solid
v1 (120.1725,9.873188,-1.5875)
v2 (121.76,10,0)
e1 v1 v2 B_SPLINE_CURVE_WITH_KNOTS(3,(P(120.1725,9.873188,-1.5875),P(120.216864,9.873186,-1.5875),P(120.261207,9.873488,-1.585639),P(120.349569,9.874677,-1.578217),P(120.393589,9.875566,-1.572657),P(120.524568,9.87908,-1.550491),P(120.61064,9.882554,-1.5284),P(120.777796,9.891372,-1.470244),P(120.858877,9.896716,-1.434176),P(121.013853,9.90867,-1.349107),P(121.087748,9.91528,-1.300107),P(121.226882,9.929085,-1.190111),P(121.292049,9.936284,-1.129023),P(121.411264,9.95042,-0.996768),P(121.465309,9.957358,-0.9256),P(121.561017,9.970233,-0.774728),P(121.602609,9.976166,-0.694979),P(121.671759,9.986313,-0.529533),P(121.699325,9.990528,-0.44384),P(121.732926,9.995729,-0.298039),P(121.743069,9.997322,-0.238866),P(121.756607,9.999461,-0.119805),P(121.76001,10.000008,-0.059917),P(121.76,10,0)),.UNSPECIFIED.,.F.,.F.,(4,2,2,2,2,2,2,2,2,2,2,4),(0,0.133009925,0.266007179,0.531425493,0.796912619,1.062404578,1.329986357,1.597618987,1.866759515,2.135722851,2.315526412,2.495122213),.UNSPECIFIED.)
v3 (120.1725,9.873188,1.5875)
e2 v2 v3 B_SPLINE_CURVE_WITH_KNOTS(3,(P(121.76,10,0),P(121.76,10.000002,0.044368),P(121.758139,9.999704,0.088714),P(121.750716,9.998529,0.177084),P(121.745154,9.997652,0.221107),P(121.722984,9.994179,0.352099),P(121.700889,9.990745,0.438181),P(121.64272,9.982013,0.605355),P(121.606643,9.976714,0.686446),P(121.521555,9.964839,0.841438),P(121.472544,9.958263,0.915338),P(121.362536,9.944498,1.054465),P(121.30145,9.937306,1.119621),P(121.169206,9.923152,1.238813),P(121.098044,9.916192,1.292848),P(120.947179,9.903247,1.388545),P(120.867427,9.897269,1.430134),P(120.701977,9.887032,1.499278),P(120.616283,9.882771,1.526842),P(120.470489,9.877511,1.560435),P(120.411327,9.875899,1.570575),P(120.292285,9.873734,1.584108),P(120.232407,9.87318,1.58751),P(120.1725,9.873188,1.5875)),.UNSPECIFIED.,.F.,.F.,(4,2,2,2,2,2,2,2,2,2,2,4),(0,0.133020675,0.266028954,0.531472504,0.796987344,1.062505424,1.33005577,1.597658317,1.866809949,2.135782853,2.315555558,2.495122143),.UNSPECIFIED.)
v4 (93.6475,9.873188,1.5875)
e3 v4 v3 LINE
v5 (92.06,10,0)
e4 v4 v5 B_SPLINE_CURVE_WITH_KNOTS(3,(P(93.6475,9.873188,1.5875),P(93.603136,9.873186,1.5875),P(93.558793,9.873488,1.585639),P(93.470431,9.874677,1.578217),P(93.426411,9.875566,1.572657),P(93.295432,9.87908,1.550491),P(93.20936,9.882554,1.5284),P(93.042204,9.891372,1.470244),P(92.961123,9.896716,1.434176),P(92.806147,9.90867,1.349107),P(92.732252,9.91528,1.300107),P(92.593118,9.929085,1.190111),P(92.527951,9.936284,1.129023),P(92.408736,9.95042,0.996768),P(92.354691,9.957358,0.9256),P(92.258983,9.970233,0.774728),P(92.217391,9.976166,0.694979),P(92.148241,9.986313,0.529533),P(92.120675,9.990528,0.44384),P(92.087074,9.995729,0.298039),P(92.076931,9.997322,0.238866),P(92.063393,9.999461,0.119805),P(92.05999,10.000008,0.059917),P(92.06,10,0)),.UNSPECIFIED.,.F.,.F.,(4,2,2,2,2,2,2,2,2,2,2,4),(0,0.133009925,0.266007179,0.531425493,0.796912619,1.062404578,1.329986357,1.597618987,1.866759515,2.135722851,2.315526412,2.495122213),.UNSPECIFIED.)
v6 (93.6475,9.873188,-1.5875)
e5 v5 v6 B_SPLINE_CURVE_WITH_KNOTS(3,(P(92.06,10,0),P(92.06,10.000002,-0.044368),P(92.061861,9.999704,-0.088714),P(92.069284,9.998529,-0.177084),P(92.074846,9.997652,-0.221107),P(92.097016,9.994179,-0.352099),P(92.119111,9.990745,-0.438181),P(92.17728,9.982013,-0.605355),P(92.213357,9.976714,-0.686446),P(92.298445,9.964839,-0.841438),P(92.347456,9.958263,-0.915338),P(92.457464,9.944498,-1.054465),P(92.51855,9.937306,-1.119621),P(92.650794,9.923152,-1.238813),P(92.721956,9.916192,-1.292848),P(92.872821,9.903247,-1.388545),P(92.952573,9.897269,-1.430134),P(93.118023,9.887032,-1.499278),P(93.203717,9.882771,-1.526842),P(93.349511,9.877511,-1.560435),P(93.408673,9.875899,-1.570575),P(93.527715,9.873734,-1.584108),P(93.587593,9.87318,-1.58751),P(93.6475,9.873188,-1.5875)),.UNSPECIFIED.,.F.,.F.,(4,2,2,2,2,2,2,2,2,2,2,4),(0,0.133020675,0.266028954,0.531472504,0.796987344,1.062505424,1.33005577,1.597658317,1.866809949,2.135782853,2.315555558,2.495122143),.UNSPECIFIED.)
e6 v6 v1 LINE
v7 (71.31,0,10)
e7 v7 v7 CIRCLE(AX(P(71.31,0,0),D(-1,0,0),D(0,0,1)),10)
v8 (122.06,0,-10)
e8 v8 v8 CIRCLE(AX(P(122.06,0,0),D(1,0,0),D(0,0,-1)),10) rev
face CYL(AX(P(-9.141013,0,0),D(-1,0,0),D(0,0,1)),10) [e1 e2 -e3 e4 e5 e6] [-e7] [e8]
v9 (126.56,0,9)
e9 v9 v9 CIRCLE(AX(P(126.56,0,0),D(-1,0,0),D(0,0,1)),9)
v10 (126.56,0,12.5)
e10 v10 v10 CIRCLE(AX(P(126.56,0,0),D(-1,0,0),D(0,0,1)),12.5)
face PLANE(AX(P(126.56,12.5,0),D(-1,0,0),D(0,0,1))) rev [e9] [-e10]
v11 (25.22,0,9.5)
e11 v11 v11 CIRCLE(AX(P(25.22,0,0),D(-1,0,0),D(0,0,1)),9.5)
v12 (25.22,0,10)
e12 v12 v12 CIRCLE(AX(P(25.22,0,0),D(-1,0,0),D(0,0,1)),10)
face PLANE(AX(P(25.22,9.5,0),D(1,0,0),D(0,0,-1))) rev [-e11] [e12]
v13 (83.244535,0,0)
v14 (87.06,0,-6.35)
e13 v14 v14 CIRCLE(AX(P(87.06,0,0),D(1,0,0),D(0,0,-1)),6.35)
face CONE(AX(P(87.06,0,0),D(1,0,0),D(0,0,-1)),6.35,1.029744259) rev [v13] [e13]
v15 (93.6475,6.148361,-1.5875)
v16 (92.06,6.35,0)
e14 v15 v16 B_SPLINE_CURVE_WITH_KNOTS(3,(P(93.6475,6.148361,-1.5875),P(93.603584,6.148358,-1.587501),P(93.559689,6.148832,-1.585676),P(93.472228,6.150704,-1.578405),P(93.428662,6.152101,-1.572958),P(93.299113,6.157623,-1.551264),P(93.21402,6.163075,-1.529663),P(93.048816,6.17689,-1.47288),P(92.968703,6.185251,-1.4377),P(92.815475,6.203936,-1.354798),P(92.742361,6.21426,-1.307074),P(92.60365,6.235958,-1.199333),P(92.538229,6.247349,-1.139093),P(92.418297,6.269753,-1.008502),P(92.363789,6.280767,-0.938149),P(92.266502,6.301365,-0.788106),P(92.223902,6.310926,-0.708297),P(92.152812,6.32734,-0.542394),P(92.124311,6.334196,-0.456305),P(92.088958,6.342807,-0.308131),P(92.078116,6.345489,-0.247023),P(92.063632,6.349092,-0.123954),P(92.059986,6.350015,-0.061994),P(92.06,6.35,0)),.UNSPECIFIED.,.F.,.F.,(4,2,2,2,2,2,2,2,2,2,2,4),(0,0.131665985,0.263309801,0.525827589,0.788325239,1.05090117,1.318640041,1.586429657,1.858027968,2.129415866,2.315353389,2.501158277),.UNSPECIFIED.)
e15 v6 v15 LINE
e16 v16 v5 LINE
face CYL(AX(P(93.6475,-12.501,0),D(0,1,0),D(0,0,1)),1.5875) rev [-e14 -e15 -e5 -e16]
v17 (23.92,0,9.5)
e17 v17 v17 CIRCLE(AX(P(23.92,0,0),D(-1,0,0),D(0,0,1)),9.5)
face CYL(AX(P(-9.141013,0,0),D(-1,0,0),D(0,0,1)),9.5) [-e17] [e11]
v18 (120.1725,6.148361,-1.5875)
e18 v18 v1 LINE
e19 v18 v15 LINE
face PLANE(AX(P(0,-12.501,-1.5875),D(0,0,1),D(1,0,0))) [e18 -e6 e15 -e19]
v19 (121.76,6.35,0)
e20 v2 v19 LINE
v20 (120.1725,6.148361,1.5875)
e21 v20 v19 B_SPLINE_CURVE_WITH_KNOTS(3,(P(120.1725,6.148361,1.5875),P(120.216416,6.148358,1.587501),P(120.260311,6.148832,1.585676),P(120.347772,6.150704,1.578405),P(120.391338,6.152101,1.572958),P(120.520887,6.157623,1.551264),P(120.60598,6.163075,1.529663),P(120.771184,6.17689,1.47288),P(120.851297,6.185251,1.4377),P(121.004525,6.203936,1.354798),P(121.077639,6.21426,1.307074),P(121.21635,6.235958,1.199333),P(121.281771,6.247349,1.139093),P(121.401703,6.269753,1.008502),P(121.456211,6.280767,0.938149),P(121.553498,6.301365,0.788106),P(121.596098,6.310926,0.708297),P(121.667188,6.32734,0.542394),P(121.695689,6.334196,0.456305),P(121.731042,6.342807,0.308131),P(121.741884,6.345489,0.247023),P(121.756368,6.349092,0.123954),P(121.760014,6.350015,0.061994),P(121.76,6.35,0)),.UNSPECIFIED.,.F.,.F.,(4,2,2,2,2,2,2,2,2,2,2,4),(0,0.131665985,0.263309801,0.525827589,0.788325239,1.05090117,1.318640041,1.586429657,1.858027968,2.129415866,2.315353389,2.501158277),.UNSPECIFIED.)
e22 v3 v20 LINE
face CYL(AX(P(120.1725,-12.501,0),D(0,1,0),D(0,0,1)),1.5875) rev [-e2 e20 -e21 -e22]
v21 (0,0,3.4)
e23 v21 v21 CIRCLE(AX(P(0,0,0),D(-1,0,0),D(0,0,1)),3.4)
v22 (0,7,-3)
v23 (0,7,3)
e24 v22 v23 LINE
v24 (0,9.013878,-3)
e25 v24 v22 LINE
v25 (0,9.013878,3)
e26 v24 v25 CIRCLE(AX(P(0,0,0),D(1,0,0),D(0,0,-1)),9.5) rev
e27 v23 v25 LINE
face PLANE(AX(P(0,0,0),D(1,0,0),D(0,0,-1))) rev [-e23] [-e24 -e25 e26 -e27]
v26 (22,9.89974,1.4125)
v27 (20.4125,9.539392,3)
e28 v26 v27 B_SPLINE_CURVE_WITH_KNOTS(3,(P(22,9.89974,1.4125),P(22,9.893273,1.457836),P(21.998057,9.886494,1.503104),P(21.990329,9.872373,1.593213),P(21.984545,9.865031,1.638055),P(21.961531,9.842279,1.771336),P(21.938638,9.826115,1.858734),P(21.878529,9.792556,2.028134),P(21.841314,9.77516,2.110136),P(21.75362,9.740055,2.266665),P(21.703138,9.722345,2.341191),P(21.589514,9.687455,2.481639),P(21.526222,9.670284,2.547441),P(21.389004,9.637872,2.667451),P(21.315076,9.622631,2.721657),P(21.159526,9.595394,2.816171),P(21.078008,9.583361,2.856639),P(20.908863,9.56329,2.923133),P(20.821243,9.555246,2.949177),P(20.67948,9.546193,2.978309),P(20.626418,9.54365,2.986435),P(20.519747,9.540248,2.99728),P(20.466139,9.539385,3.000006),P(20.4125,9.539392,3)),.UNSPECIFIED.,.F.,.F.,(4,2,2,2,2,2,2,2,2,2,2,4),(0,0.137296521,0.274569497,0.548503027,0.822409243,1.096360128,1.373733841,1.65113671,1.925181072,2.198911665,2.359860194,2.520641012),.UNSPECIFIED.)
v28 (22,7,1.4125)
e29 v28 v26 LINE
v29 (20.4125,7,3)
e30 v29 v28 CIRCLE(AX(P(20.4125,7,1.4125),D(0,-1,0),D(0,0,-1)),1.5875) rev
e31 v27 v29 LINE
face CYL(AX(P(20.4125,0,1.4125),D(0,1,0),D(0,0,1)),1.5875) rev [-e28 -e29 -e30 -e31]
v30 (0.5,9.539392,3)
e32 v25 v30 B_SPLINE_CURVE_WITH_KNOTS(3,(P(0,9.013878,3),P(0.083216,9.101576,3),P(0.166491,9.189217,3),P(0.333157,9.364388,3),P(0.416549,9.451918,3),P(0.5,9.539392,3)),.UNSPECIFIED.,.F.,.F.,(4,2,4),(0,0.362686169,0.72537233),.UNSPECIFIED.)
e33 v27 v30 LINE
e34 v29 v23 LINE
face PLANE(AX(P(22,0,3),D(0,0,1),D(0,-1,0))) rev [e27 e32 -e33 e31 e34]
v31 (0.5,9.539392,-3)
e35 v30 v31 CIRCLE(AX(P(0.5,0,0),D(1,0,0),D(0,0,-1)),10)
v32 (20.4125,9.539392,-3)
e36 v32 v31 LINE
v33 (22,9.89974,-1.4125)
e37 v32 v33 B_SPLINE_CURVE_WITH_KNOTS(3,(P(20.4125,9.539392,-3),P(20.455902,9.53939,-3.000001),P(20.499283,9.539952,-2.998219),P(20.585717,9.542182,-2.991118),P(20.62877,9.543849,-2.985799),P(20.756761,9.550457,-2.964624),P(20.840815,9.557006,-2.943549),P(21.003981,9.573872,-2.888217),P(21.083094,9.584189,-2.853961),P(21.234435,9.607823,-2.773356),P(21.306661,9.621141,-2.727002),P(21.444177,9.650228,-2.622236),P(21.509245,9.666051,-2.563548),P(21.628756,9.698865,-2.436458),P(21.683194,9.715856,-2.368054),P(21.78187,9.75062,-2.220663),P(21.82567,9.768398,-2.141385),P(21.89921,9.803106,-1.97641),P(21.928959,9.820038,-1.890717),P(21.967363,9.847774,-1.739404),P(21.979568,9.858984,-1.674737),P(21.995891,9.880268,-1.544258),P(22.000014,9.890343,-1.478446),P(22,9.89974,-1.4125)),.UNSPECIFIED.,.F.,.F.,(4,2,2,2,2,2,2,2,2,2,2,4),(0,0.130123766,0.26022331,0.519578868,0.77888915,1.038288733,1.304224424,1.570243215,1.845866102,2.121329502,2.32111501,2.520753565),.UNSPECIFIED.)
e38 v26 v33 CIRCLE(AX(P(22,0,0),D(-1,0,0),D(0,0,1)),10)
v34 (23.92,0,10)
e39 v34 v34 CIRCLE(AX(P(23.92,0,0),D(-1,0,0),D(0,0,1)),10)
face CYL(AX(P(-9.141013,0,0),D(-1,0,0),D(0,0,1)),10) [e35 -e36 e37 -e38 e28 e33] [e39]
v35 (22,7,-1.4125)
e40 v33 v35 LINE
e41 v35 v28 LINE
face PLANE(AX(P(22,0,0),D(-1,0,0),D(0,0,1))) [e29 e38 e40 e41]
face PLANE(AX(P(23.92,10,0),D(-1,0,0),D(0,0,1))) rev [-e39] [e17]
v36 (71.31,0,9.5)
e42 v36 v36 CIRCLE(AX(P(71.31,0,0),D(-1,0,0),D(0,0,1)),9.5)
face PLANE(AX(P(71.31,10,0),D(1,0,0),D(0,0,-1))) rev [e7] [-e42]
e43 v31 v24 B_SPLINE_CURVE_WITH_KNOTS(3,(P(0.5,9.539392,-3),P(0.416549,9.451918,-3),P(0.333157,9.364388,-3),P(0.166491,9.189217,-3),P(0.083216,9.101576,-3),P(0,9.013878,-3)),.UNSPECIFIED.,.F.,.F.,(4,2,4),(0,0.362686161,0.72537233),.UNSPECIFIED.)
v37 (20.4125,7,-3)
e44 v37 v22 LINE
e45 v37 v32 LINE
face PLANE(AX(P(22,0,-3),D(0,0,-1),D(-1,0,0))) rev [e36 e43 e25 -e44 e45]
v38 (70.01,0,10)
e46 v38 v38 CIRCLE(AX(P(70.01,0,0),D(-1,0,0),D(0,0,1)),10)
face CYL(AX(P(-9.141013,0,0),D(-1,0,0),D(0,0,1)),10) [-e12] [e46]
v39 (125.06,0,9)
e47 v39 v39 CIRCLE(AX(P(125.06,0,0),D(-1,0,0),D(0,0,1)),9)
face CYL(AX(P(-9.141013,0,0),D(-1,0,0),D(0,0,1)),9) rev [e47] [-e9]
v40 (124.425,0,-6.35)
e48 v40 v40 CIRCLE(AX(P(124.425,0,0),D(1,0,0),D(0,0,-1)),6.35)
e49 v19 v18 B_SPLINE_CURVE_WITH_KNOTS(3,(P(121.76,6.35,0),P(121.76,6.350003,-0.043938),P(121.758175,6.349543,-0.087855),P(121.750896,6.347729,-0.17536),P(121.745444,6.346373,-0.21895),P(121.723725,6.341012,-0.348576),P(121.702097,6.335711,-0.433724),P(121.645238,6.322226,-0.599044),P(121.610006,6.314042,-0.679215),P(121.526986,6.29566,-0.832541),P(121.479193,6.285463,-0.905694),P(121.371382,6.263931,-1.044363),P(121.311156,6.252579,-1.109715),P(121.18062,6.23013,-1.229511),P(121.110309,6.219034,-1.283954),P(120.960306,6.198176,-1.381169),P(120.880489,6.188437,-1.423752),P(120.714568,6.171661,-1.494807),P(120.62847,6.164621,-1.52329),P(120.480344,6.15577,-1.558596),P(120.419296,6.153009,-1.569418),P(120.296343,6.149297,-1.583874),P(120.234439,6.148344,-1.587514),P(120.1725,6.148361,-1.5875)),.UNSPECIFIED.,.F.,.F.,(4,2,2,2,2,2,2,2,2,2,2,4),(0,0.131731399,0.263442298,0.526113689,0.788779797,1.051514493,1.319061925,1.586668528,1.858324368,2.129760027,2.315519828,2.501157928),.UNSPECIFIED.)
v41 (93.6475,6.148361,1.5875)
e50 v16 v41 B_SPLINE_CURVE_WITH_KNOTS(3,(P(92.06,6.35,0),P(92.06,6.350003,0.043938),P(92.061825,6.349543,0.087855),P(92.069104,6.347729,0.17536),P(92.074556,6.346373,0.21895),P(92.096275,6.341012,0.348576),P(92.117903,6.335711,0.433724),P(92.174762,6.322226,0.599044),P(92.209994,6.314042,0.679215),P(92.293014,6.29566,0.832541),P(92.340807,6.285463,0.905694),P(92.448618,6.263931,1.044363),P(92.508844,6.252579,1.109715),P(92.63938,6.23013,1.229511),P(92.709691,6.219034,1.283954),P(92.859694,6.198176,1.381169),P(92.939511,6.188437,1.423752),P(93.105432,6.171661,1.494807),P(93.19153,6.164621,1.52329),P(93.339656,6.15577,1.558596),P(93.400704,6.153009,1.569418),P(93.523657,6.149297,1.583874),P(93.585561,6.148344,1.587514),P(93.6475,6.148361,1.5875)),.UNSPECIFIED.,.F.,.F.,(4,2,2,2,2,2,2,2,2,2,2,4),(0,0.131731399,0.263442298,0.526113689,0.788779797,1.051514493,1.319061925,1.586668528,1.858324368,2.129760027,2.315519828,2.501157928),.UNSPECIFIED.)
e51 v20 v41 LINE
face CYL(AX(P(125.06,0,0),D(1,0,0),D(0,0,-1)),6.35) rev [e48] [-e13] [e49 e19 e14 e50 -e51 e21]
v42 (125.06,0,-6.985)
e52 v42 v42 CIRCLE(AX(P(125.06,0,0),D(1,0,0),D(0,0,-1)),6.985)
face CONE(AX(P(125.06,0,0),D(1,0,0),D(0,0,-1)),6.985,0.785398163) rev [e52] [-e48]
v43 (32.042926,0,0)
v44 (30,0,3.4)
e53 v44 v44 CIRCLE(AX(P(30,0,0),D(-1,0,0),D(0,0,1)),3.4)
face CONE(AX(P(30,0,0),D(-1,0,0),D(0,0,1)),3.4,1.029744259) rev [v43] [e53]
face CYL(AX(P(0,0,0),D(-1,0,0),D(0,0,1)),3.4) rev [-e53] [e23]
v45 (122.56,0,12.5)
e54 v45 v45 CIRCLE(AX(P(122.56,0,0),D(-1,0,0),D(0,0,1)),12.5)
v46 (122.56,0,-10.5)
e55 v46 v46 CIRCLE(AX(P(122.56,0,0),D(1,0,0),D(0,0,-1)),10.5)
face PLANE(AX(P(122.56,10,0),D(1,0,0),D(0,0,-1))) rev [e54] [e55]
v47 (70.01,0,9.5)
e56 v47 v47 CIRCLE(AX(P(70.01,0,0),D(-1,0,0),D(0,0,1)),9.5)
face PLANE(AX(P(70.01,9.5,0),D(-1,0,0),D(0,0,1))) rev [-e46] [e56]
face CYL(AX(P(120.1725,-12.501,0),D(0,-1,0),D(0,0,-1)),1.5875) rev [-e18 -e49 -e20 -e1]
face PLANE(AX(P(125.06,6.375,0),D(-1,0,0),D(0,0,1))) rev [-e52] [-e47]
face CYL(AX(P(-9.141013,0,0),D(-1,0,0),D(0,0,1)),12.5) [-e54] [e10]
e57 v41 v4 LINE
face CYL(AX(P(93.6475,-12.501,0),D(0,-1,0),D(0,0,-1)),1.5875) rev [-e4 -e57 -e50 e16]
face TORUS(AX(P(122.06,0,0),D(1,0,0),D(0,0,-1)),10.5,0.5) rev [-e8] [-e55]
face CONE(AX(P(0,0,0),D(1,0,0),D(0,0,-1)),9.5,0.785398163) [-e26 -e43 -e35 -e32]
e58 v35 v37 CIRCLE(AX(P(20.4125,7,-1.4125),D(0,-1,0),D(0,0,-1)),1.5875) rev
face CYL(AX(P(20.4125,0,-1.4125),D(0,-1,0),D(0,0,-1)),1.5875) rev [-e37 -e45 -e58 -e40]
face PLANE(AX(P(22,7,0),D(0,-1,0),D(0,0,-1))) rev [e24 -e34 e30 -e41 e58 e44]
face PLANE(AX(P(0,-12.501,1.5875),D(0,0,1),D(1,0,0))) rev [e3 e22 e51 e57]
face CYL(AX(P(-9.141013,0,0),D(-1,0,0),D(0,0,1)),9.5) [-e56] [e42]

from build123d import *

# Parameters (mm, degrees)
F_1_2_0_5_DIAMETER_HOLE1_D           = 12.7
F_1_2_0_5_DIAMETER_HOLE1_DEPTH       = 38
F_1_2_0_5_DIAMETER_HOLE1_CSINK_D     = 13.97
F_1_2_0_5_DIAMETER_HOLE1_CSINK_ANGLE = 90
F_1_2_0_5_DIAMETER_HOLE1_TIP         = 3.815464931
FILLET1_R                            = 0.5
CUT_EXTRUDE2_DEPTH                   = 22
FILLET2_R                            = 1.5875
CHAMFER2_SIZE                        = 0.5
M8X1_25_TAPPED_HOLE1_D               = 6.8
M8X1_25_TAPPED_HOLE1_DEPTH           = 30
M8X1_25_TAPPED_HOLE1_TIP             = 2.042926105
CUT_EXTRUDE3_REACH                   = 131.151
CUT_EXTRUDE3_END_RADIUS              = 6.35
SKETCH9_W                            = 29.7
SKETCH9_H                            = 3.175
FILLET4_R                            = 1.5875


with BuildPart() as part:
    # Sketch1 → Revolve1 (revolve)
    with BuildSketch(Plane.XY, mode=Mode.PRIVATE) as revolve1_sk:
        Polygon((0, 0), (0, 10), (23.92, 10), (23.92, 9.5), (25.22, 9.5), (25.22, 10), (70.01, 10), (70.01, 9.5), (71.31, 9.5), (71.31, 10), (122.56, 10), (122.56, 12.5), (126.56, 12.5), (126.56, 9), (125.06, 9), (125.06, 6.375), (125.06, 0), (87.56, 0), align=None)
    revolve(revolve1_sk.sketch.rotate(Axis((-9.141012775, 0, 0), (1, 0, 0)), 90), axis=Axis((-9.141012775, 0, 0), (1, 0, 0)))

    # 1/2 (0.5) Diameter Hole1
    with Locations(Plane(origin=(125.06, 0, 0), x_dir=(0, 0, -1), z_dir=(1, 0, 0))):
        with Locations((0, 0)):
            CounterSinkHole(F_1_2_0_5_DIAMETER_HOLE1_D / 2, F_1_2_0_5_DIAMETER_HOLE1_CSINK_D / 2, depth=F_1_2_0_5_DIAMETER_HOLE1_DEPTH, counter_sink_angle=F_1_2_0_5_DIAMETER_HOLE1_CSINK_ANGLE)
            with Locations((0, 0, -(F_1_2_0_5_DIAMETER_HOLE1_DEPTH + F_1_2_0_5_DIAMETER_HOLE1_TIP / 2))):  # 118° drill point
                Cone(0, F_1_2_0_5_DIAMETER_HOLE1_D / 2, F_1_2_0_5_DIAMETER_HOLE1_TIP, mode=Mode.SUBTRACT)

    # Fillet1
    fillet1_edges = [part.edges().sort_by_distance(p)[0] for p in [
        (122.56, 0, -10),
    ]]
    fillet(fillet1_edges, radius=FILLET1_R)

    # Sketch6 → Cut-Extrude2 (cut)
    with BuildSketch(Plane.ZY):
        Polygon((-3, 73.427602241), (-3, 9.539392014), (-3, 7), (3, 7), (3, 9.539392014), (3, 73.427602241), (3, 201.204022694), (-3, 201.204022694), align=None)
    extrude(amount=-CUT_EXTRUDE2_DEPTH, mode=Mode.SUBTRACT)

    # Fillet2
    fillet2_edges = [part.edges().sort_by_distance(p)[0] for p in [
        (22, 8.269696007, -3),
        (22, 8.269696007, 3),
    ]]
    fillet(fillet2_edges, radius=FILLET2_R)

    # Chamfer2
    chamfer2_edges = [part.edges().sort_by_distance(p)[0] for p in [
        (0, -8.062257748, -5.916079783),
    ]]
    chamfer(chamfer2_edges, length=CHAMFER2_SIZE)

    # M8x1.25 Tapped Hole1
    with Locations(Plane.ZY):
        with Locations((0, 0)):
            Hole(M8X1_25_TAPPED_HOLE1_D / 2, depth=M8X1_25_TAPPED_HOLE1_DEPTH)
            with Locations((0, 0, -(M8X1_25_TAPPED_HOLE1_DEPTH + M8X1_25_TAPPED_HOLE1_TIP / 2))):  # 118° drill point
                Cone(0, M8X1_25_TAPPED_HOLE1_D / 2, M8X1_25_TAPPED_HOLE1_TIP, mode=Mode.SUBTRACT)

    # Cut-Extrude3: up to this cylinder (the profile starts outside it)
    cut_extrude3_end = Plane(origin=(106.91, 0, 0), z_dir=(1, 0, 0)) * Cylinder(CUT_EXTRUDE3_END_RADIUS, 276.002, mode=Mode.PRIVATE)
    # Sketch9 → Cut-Extrude3 (cut, up to the surface)
    with BuildSketch(Plane(origin=(0, 10, 0), x_dir=(1, 0, 0), z_dir=(0, 1, 0)), mode=Mode.PRIVATE) as cut_extrude3_sk1:
        with Locations((106.91, 0)):
            Rectangle(SKETCH9_W, SKETCH9_H)
    cut_extrude3_tool1 = extrude(cut_extrude3_sk1.sketch, amount=-CUT_EXTRUDE3_REACH, mode=Mode.PRIVATE) - cut_extrude3_end
    add(cut_extrude3_tool1.solids().sort_by_distance((106.91, 10, 0))[0], mode=Mode.SUBTRACT)

    # Fillet4
    fillet4_edges = [part.edges().sort_by_distance(p)[0] for p in [
        (92.06, 8.010774594, 1.5875),
        (121.76, 8.010774594, 1.5875),
        (121.76, 8.010774594, -1.5875),
        (92.06, 8.010774594, -1.5875),
    ]]
    fillet(fillet4_edges, radius=FILLET4_R - 0.0001)  # a hair under: the kernel refuses the full size


solid = part.part
